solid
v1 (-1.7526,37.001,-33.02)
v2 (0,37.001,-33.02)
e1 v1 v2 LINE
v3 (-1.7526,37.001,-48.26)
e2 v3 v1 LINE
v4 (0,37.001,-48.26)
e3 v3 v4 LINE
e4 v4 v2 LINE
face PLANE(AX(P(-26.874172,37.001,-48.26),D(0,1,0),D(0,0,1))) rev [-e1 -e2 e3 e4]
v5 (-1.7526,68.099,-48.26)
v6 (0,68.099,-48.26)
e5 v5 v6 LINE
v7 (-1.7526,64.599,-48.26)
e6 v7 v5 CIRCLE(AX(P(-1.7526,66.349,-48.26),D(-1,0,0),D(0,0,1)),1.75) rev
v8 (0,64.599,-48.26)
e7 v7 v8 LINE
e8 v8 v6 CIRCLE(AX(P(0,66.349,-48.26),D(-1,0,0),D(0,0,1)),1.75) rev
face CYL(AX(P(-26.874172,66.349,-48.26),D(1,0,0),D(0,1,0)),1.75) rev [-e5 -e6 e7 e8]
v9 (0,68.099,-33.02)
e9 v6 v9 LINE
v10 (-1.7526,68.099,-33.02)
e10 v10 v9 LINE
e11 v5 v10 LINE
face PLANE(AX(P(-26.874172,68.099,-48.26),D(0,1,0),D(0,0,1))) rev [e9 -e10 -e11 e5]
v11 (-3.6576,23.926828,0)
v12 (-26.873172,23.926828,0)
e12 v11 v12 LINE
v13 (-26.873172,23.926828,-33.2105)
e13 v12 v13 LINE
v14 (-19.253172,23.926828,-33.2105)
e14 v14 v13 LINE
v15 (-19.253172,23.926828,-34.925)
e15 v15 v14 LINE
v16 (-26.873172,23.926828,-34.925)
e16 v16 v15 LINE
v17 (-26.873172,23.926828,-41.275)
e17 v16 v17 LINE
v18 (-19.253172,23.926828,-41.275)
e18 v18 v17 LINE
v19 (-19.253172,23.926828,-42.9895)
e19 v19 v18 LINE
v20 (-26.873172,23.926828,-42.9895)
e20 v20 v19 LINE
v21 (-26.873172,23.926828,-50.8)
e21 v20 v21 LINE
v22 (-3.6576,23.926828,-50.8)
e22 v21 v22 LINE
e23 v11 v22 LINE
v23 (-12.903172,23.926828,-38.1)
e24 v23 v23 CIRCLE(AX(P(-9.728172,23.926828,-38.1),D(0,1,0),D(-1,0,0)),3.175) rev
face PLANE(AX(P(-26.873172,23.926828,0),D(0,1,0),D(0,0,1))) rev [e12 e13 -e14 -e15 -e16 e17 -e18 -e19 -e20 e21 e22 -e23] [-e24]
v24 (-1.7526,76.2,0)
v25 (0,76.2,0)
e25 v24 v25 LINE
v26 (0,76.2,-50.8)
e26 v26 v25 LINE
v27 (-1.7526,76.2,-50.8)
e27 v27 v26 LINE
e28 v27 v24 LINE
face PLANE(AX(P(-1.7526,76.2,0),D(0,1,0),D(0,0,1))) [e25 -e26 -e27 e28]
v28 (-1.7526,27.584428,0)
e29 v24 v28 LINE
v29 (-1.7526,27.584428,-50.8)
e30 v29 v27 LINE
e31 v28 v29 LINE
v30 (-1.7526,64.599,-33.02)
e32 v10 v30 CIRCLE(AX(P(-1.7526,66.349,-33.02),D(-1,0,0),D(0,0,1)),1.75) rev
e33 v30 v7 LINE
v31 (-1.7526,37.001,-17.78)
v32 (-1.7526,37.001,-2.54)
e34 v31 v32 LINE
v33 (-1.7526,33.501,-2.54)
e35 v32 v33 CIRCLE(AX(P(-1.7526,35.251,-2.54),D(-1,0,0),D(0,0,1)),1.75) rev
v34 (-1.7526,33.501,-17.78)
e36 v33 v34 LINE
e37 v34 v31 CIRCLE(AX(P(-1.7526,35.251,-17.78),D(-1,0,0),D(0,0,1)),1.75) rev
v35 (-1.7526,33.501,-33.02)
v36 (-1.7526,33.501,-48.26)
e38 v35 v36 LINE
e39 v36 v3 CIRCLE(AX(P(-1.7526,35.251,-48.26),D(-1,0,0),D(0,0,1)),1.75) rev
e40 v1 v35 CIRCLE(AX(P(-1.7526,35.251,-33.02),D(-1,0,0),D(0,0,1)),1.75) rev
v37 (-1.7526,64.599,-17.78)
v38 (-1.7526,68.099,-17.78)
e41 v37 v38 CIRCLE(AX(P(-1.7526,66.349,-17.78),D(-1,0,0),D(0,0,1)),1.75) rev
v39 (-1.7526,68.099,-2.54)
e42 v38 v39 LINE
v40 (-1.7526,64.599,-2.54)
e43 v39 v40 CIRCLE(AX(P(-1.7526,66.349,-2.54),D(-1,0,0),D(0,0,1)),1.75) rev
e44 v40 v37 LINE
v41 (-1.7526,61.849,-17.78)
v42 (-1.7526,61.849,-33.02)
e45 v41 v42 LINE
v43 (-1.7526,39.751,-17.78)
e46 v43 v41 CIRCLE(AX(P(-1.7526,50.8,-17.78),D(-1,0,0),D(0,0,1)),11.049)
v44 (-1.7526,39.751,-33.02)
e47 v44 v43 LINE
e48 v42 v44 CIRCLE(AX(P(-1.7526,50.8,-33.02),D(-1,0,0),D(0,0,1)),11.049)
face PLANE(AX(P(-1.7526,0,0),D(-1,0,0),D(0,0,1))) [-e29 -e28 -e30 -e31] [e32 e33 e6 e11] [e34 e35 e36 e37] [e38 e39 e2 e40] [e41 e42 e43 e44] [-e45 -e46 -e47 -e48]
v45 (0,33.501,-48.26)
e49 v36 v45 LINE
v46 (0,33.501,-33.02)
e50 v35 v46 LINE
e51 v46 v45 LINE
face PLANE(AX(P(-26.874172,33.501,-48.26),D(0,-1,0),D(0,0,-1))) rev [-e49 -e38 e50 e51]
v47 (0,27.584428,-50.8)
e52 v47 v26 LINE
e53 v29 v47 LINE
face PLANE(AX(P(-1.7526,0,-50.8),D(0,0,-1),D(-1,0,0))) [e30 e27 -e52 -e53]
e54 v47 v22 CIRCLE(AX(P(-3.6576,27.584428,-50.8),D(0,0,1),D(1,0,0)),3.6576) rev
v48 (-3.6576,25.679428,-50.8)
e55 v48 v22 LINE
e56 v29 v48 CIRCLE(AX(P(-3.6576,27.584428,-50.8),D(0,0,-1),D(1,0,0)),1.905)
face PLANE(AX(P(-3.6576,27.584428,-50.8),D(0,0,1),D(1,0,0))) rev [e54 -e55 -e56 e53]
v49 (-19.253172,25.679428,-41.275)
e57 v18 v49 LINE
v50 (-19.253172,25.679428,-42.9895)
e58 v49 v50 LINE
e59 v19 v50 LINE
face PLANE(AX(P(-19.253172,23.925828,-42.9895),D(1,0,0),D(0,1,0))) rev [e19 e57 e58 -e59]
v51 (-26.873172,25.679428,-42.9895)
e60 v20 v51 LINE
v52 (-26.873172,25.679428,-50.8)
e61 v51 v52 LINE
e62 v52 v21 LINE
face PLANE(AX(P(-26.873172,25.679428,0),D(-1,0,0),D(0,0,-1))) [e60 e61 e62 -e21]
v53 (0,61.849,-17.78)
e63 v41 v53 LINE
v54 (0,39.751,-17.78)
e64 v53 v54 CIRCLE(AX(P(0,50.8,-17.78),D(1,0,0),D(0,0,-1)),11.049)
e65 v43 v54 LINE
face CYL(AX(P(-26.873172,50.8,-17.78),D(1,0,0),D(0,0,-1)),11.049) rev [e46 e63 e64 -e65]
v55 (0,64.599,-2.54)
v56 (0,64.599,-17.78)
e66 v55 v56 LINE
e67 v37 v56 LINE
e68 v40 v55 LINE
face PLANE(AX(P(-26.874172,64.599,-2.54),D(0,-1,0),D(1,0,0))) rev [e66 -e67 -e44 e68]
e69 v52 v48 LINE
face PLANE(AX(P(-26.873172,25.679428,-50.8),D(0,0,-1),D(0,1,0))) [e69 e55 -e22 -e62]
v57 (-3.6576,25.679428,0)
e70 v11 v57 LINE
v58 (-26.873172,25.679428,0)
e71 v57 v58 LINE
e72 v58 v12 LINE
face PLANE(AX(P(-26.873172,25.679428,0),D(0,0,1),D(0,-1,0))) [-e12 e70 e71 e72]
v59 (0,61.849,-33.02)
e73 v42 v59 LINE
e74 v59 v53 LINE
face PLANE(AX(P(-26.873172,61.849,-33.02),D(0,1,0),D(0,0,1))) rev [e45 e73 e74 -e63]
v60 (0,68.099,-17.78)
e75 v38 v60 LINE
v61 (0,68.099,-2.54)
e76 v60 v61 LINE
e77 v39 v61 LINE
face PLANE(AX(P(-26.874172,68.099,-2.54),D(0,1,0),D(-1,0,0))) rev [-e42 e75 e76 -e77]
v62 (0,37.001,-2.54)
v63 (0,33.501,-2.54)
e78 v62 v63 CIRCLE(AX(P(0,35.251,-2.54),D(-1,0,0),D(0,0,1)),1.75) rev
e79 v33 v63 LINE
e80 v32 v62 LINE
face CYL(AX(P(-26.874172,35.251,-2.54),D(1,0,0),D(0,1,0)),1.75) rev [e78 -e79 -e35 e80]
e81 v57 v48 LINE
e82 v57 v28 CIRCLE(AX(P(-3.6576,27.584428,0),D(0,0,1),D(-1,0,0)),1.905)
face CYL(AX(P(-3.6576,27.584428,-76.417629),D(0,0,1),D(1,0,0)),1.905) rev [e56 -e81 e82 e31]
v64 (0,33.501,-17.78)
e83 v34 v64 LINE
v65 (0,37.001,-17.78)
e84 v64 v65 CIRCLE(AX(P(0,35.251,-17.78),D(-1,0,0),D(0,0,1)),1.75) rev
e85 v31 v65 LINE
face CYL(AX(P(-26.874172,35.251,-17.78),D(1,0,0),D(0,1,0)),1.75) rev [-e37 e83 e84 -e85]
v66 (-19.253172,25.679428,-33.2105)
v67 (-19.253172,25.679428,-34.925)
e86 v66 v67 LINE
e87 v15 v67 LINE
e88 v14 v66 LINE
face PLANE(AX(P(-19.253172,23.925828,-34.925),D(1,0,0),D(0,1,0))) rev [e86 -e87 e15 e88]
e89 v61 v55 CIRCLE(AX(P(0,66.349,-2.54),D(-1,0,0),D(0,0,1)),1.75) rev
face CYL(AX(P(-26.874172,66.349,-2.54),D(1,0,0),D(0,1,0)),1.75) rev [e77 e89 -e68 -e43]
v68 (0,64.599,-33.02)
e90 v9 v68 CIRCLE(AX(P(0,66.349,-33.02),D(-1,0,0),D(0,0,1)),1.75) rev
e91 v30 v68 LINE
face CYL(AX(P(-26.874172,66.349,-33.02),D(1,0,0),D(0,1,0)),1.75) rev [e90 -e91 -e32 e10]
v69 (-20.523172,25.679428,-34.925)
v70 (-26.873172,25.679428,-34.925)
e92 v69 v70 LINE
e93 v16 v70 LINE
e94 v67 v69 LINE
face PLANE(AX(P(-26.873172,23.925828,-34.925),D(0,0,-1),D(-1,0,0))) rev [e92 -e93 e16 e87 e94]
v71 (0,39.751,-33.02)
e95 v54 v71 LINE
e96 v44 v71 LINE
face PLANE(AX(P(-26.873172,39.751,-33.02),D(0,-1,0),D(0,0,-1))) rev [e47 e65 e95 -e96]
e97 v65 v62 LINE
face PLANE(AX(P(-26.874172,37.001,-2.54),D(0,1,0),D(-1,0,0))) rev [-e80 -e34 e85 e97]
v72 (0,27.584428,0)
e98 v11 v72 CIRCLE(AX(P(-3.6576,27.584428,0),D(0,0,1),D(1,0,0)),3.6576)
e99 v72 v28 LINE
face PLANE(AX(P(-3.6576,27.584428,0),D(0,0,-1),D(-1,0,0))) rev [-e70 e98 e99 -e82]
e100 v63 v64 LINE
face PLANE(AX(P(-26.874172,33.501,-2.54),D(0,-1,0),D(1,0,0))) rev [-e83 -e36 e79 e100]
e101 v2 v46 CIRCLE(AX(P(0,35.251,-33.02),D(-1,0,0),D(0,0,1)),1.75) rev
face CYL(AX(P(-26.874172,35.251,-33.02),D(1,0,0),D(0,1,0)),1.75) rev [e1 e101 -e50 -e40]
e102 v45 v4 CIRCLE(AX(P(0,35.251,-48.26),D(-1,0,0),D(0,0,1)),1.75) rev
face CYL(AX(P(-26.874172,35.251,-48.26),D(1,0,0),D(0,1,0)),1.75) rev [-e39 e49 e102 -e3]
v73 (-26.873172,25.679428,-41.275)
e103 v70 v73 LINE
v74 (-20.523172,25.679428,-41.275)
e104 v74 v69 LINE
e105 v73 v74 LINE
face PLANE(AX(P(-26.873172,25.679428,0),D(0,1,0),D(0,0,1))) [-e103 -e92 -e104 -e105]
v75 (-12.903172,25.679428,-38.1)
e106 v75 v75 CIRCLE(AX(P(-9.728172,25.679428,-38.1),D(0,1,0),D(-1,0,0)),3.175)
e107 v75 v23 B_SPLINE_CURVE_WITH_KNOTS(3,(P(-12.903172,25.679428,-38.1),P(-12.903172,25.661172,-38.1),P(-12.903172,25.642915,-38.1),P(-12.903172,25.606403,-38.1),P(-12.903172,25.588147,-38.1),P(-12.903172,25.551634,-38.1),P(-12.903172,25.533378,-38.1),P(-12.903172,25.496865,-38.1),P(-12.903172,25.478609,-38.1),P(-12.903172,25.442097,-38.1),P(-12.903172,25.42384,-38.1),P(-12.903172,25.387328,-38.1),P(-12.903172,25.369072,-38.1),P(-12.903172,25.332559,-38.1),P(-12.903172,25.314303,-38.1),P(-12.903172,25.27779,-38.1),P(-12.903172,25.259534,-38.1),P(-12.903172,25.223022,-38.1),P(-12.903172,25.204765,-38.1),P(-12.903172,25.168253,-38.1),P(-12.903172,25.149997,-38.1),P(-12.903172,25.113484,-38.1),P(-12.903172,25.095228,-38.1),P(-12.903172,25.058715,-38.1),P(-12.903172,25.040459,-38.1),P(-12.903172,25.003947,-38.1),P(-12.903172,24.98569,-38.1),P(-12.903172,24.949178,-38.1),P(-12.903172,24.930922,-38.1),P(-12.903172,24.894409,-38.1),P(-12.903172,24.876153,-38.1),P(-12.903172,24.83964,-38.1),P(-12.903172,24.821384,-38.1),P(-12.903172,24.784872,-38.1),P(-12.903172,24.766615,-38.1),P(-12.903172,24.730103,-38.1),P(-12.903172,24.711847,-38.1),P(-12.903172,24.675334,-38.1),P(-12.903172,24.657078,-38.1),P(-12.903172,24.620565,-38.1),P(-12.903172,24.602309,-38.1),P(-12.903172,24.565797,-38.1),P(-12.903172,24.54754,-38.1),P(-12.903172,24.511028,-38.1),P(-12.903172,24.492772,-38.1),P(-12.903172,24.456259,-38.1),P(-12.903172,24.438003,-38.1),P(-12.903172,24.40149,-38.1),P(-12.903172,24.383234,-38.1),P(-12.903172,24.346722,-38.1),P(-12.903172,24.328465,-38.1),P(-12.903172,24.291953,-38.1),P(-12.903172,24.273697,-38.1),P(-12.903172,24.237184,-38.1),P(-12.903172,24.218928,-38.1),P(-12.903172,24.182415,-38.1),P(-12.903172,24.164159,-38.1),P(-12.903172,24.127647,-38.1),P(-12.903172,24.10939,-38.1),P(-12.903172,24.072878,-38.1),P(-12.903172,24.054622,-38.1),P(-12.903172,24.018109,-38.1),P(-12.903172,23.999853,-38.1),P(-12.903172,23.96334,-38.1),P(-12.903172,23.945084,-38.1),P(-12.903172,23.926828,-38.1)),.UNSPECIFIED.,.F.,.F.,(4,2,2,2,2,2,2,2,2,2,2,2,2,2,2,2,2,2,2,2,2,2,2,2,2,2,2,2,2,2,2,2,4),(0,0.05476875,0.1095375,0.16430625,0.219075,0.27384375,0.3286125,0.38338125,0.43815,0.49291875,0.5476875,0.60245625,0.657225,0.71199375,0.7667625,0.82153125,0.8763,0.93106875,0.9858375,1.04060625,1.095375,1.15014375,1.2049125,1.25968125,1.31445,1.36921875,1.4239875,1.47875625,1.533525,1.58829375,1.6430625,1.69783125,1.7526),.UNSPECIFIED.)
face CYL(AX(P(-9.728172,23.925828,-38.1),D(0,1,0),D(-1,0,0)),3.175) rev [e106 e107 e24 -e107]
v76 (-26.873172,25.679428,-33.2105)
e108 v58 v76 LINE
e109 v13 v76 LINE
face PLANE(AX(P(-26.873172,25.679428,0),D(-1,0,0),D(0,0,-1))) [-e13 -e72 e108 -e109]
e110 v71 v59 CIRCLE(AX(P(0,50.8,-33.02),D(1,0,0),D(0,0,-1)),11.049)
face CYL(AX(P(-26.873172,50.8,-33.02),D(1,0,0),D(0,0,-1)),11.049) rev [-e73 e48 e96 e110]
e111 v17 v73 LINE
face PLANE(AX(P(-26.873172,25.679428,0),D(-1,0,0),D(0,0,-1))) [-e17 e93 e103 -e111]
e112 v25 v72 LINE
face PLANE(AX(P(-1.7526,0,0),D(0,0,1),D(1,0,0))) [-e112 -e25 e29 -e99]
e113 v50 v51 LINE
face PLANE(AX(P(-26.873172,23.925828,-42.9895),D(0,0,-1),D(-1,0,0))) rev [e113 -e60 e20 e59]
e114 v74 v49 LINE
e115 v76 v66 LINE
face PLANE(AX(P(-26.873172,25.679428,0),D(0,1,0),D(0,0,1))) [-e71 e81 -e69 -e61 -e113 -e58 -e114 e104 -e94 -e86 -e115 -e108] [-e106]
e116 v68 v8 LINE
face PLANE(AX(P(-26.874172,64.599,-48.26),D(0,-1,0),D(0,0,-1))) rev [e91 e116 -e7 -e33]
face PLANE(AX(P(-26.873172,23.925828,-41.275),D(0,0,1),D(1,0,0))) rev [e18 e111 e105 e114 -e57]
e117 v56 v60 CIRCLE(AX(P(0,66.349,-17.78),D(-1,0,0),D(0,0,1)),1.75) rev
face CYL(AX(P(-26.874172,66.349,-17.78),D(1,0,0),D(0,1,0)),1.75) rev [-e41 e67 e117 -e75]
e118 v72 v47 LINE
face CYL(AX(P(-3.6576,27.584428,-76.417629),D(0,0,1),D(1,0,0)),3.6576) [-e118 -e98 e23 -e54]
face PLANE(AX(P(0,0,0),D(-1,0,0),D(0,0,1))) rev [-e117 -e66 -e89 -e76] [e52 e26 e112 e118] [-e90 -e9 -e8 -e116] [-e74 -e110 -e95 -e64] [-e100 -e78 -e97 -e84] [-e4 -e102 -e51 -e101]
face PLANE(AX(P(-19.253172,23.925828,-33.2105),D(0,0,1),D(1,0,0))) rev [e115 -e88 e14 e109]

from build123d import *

# Parameters (mm, degrees)
SKETCH2_W              = 50.8
SKETCH2_H              = 76.2
BASE_FLANGE1_DEPTH     = 1.7526
SKETCHED_START         = -50.8
SKETCHED_BEND1_DEPTH   = 50.8
SKETCHED_BEND1_2_DEPTH = 50.8
CUT_EXTRUDE2_DEPTH     = 96.442377265
CUT_EXTRUDE3_REACH     = 97.512
CUT_EXTRUDE4_REACH     = 78.519
SKETCH11_R             = 3.175
CUT_EXTRUDE5_REACH     = 78.519
SKETCH12_W             = 7.62
SKETCH12_H             = 1.7145


# Read off the part's stored shape, not the designer's step: Sketched Bend1
# Sheet-metal steps are written as plain solids
with BuildPart() as part:
    # Sketch2 → Base-Flange1 (new body)
    with BuildSketch(Plane(origin=(0, 0, 0), x_dir=(0, 0, -1), z_dir=(1, 0, 0))):
        with Locations((25.4, 38.1)):
            Rectangle(SKETCH2_W, SKETCH2_H)
    extrude(amount=-BASE_FLANGE1_DEPTH)

    # Sketched Bend1 outline → Sketched Bend1 (cut)
    with BuildSketch(Plane.XY.offset(SKETCHED_START)):
        with BuildLine():
            ThreePointArc((0, 27.584427912), (-0.468104291, 25.794133277), (-1.7526, 24.462087002))
            Line((-1.7526, 24.462087002), (-1.7526, 0))
            Line((-1.7526, 0), (0, 0))
            Line((0, 0), (0, 27.584427912))
        make_face()
    extrude(amount=SKETCHED_BEND1_DEPTH, mode=Mode.SUBTRACT)

    # Sketched Bend1 2 outline → Sketched Bend1 2 (add)
    with BuildSketch(Plane.XY.offset(SKETCHED_START)):
        with BuildLine():
            ThreePointArc((-1.7526, 27.584427912), (-2.310561582, 26.237389494), (-3.6576, 25.679427912))
            Line((-3.6576, 25.679427912), (-26.873172088, 25.679427912))
            Line((-26.873172088, 25.679427912), (-26.873172088, 23.926827912))
            Line((-26.873172088, 23.926827912), (-3.6576, 23.926827912))
            ThreePointArc((-3.6576, 23.926827912), (-2.668215432, 24.063184391), (-1.7526, 24.462087002))
            Line((-1.7526, 24.462087002), (-1.7526, 27.584427912))
        make_face()
    extrude(amount=SKETCHED_BEND1_2_DEPTH)

    # Sketch9 → Cut-Extrude2 (cut, through all)
    with BuildSketch(Plane(origin=(0, 0, 0), x_dir=(0, 0, -1), z_dir=(1, 0, 0))):
        with BuildLine():
            Line((33.02, 39.751), (17.78, 39.751))
            ThreePointArc((17.78, 39.751), (6.731, 50.8), (17.78, 61.849))
            Line((17.78, 61.849), (33.02, 61.849))
            ThreePointArc((33.02, 61.849), (44.069, 50.8), (33.02, 39.751))
        make_face()
    extrude(amount=-CUT_EXTRUDE2_DEPTH, mode=Mode.SUBTRACT)

    # Sketch10 → Cut-Extrude3 (cut, up to next)
    with BuildSketch(Plane(origin=(0.2474, 0, 0), x_dir=(0, 0, -1), z_dir=(1, 0, 0)), mode=Mode.PRIVATE) as cut_extrude3_sk1:
        with BuildLine():
            Line((2.54, 68.099), (17.78, 68.099))
            ThreePointArc((17.78, 68.099), (19.53, 66.349), (17.78, 64.599))
            Line((17.78, 64.599), (2.54, 64.599))
            ThreePointArc((2.54, 64.599), (0.79, 66.349), (2.54, 68.099))
        make_face()
    cut_extrude3_tool1 = extrude(cut_extrude3_sk1.sketch, amount=-CUT_EXTRUDE3_REACH, mode=Mode.PRIVATE) & part.part
    # Sketch10 → Cut-Extrude3 (cut, up to next)
    with BuildSketch(Plane(origin=(0.2474, 0, 0), x_dir=(0, 0, -1), z_dir=(1, 0, 0)), mode=Mode.PRIVATE) as cut_extrude3_sk2:
        with BuildLine():
            Line((2.54, 33.501), (17.78, 33.501))
            ThreePointArc((17.78, 33.501), (19.53, 35.251), (17.78, 37.001))
            Line((17.78, 37.001), (2.54, 37.001))
            ThreePointArc((2.54, 37.001), (0.79, 35.251), (2.54, 33.501))
        make_face()
    cut_extrude3_tool2 = extrude(cut_extrude3_sk2.sketch, amount=-CUT_EXTRUDE3_REACH, mode=Mode.PRIVATE) & part.part
    # Sketch10 → Cut-Extrude3 (cut, up to next)
    with BuildSketch(Plane(origin=(0.2474, 0, 0), x_dir=(0, 0, -1), z_dir=(1, 0, 0)), mode=Mode.PRIVATE) as cut_extrude3_sk3:
        with BuildLine():
            Line((48.26, 33.501), (33.02, 33.501))
            ThreePointArc((33.02, 33.501), (31.27, 35.251), (33.02, 37.001))
            Line((33.02, 37.001), (48.26, 37.001))
            ThreePointArc((48.26, 37.001), (50.01, 35.251), (48.26, 33.501))
        make_face()
    cut_extrude3_tool3 = extrude(cut_extrude3_sk3.sketch, amount=-CUT_EXTRUDE3_REACH, mode=Mode.PRIVATE) & part.part
    # Sketch10 → Cut-Extrude3 (cut, up to next)
    with BuildSketch(Plane(origin=(0.2474, 0, 0), x_dir=(0, 0, -1), z_dir=(1, 0, 0)), mode=Mode.PRIVATE) as cut_extrude3_sk4:
        with BuildLine():
            Line((48.26, 68.099), (33.02, 68.099))
            ThreePointArc((33.02, 68.099), (31.27, 66.349), (33.02, 64.599))
            Line((33.02, 64.599), (48.26, 64.599))
            ThreePointArc((48.26, 64.599), (50.01, 66.349), (48.26, 68.099))
        make_face()
    cut_extrude3_tool4 = extrude(cut_extrude3_sk4.sketch, amount=-CUT_EXTRUDE3_REACH, mode=Mode.PRIVATE) & part.part
    add(cut_extrude3_tool1.solids().sort_by_distance((0.2474, 66.349, -10.16))[0], mode=Mode.SUBTRACT)
    add(cut_extrude3_tool2.solids().sort_by_distance((0.2474, 35.251, -10.16))[0], mode=Mode.SUBTRACT)
    add(cut_extrude3_tool3.solids().sort_by_distance((0.2474, 35.251, -40.64))[0], mode=Mode.SUBTRACT)
    add(cut_extrude3_tool4.solids().sort_by_distance((0.2474, 66.349, -40.64))[0], mode=Mode.SUBTRACT)

    # Sketch11 → Cut-Extrude4 (cut, up to next)
    with BuildSketch(Plane(origin=(0, 25.679427912, 0), x_dir=(1, 0, 0), z_dir=(0, 1, 0)), mode=Mode.PRIVATE) as cut_extrude4_sk1:
        with Locations(Location((-9.728172088, 38.1, 0), (0, 0, 180))):
            Circle(SKETCH11_R)
    cut_extrude4_tool1 = extrude(cut_extrude4_sk1.sketch, amount=-CUT_EXTRUDE4_REACH, mode=Mode.PRIVATE) & part.part
    add(cut_extrude4_tool1.solids().sort_by_distance((-9.728172, 25.679428, -38.1))[0], mode=Mode.SUBTRACT)

    # Sketch12 → Cut-Extrude5 (cut, up to next)
    with BuildSketch(Plane(origin=(0, 25.679427912, 0), x_dir=(1, 0, 0), z_dir=(0, 1, 0)), mode=Mode.PRIVATE) as cut_extrude5_sk1:
        with Locations((-23.063172088, 34.06775)):
            Rectangle(SKETCH12_W, SKETCH12_H)
    cut_extrude5_tool1 = extrude(cut_extrude5_sk1.sketch, amount=-CUT_EXTRUDE5_REACH, mode=Mode.PRIVATE) & part.part
    # Sketch12 → Cut-Extrude5 (cut, up to next)
    with BuildSketch(Plane(origin=(0, 25.679427912, 0), x_dir=(1, 0, 0), z_dir=(0, 1, 0)), mode=Mode.PRIVATE) as cut_extrude5_sk2:
        with Locations((-23.063172088, 42.13225)):
            Rectangle(SKETCH12_W, SKETCH12_H)
    cut_extrude5_tool2 = extrude(cut_extrude5_sk2.sketch, amount=-CUT_EXTRUDE5_REACH, mode=Mode.PRIVATE) & part.part
    add(cut_extrude5_tool1.solids().sort_by_distance((-23.063172, 25.679428, -34.06775))[0], mode=Mode.SUBTRACT)
    add(cut_extrude5_tool2.solids().sort_by_distance((-23.063172, 25.679428, -42.13225))[0], mode=Mode.SUBTRACT)


solid = part.part
